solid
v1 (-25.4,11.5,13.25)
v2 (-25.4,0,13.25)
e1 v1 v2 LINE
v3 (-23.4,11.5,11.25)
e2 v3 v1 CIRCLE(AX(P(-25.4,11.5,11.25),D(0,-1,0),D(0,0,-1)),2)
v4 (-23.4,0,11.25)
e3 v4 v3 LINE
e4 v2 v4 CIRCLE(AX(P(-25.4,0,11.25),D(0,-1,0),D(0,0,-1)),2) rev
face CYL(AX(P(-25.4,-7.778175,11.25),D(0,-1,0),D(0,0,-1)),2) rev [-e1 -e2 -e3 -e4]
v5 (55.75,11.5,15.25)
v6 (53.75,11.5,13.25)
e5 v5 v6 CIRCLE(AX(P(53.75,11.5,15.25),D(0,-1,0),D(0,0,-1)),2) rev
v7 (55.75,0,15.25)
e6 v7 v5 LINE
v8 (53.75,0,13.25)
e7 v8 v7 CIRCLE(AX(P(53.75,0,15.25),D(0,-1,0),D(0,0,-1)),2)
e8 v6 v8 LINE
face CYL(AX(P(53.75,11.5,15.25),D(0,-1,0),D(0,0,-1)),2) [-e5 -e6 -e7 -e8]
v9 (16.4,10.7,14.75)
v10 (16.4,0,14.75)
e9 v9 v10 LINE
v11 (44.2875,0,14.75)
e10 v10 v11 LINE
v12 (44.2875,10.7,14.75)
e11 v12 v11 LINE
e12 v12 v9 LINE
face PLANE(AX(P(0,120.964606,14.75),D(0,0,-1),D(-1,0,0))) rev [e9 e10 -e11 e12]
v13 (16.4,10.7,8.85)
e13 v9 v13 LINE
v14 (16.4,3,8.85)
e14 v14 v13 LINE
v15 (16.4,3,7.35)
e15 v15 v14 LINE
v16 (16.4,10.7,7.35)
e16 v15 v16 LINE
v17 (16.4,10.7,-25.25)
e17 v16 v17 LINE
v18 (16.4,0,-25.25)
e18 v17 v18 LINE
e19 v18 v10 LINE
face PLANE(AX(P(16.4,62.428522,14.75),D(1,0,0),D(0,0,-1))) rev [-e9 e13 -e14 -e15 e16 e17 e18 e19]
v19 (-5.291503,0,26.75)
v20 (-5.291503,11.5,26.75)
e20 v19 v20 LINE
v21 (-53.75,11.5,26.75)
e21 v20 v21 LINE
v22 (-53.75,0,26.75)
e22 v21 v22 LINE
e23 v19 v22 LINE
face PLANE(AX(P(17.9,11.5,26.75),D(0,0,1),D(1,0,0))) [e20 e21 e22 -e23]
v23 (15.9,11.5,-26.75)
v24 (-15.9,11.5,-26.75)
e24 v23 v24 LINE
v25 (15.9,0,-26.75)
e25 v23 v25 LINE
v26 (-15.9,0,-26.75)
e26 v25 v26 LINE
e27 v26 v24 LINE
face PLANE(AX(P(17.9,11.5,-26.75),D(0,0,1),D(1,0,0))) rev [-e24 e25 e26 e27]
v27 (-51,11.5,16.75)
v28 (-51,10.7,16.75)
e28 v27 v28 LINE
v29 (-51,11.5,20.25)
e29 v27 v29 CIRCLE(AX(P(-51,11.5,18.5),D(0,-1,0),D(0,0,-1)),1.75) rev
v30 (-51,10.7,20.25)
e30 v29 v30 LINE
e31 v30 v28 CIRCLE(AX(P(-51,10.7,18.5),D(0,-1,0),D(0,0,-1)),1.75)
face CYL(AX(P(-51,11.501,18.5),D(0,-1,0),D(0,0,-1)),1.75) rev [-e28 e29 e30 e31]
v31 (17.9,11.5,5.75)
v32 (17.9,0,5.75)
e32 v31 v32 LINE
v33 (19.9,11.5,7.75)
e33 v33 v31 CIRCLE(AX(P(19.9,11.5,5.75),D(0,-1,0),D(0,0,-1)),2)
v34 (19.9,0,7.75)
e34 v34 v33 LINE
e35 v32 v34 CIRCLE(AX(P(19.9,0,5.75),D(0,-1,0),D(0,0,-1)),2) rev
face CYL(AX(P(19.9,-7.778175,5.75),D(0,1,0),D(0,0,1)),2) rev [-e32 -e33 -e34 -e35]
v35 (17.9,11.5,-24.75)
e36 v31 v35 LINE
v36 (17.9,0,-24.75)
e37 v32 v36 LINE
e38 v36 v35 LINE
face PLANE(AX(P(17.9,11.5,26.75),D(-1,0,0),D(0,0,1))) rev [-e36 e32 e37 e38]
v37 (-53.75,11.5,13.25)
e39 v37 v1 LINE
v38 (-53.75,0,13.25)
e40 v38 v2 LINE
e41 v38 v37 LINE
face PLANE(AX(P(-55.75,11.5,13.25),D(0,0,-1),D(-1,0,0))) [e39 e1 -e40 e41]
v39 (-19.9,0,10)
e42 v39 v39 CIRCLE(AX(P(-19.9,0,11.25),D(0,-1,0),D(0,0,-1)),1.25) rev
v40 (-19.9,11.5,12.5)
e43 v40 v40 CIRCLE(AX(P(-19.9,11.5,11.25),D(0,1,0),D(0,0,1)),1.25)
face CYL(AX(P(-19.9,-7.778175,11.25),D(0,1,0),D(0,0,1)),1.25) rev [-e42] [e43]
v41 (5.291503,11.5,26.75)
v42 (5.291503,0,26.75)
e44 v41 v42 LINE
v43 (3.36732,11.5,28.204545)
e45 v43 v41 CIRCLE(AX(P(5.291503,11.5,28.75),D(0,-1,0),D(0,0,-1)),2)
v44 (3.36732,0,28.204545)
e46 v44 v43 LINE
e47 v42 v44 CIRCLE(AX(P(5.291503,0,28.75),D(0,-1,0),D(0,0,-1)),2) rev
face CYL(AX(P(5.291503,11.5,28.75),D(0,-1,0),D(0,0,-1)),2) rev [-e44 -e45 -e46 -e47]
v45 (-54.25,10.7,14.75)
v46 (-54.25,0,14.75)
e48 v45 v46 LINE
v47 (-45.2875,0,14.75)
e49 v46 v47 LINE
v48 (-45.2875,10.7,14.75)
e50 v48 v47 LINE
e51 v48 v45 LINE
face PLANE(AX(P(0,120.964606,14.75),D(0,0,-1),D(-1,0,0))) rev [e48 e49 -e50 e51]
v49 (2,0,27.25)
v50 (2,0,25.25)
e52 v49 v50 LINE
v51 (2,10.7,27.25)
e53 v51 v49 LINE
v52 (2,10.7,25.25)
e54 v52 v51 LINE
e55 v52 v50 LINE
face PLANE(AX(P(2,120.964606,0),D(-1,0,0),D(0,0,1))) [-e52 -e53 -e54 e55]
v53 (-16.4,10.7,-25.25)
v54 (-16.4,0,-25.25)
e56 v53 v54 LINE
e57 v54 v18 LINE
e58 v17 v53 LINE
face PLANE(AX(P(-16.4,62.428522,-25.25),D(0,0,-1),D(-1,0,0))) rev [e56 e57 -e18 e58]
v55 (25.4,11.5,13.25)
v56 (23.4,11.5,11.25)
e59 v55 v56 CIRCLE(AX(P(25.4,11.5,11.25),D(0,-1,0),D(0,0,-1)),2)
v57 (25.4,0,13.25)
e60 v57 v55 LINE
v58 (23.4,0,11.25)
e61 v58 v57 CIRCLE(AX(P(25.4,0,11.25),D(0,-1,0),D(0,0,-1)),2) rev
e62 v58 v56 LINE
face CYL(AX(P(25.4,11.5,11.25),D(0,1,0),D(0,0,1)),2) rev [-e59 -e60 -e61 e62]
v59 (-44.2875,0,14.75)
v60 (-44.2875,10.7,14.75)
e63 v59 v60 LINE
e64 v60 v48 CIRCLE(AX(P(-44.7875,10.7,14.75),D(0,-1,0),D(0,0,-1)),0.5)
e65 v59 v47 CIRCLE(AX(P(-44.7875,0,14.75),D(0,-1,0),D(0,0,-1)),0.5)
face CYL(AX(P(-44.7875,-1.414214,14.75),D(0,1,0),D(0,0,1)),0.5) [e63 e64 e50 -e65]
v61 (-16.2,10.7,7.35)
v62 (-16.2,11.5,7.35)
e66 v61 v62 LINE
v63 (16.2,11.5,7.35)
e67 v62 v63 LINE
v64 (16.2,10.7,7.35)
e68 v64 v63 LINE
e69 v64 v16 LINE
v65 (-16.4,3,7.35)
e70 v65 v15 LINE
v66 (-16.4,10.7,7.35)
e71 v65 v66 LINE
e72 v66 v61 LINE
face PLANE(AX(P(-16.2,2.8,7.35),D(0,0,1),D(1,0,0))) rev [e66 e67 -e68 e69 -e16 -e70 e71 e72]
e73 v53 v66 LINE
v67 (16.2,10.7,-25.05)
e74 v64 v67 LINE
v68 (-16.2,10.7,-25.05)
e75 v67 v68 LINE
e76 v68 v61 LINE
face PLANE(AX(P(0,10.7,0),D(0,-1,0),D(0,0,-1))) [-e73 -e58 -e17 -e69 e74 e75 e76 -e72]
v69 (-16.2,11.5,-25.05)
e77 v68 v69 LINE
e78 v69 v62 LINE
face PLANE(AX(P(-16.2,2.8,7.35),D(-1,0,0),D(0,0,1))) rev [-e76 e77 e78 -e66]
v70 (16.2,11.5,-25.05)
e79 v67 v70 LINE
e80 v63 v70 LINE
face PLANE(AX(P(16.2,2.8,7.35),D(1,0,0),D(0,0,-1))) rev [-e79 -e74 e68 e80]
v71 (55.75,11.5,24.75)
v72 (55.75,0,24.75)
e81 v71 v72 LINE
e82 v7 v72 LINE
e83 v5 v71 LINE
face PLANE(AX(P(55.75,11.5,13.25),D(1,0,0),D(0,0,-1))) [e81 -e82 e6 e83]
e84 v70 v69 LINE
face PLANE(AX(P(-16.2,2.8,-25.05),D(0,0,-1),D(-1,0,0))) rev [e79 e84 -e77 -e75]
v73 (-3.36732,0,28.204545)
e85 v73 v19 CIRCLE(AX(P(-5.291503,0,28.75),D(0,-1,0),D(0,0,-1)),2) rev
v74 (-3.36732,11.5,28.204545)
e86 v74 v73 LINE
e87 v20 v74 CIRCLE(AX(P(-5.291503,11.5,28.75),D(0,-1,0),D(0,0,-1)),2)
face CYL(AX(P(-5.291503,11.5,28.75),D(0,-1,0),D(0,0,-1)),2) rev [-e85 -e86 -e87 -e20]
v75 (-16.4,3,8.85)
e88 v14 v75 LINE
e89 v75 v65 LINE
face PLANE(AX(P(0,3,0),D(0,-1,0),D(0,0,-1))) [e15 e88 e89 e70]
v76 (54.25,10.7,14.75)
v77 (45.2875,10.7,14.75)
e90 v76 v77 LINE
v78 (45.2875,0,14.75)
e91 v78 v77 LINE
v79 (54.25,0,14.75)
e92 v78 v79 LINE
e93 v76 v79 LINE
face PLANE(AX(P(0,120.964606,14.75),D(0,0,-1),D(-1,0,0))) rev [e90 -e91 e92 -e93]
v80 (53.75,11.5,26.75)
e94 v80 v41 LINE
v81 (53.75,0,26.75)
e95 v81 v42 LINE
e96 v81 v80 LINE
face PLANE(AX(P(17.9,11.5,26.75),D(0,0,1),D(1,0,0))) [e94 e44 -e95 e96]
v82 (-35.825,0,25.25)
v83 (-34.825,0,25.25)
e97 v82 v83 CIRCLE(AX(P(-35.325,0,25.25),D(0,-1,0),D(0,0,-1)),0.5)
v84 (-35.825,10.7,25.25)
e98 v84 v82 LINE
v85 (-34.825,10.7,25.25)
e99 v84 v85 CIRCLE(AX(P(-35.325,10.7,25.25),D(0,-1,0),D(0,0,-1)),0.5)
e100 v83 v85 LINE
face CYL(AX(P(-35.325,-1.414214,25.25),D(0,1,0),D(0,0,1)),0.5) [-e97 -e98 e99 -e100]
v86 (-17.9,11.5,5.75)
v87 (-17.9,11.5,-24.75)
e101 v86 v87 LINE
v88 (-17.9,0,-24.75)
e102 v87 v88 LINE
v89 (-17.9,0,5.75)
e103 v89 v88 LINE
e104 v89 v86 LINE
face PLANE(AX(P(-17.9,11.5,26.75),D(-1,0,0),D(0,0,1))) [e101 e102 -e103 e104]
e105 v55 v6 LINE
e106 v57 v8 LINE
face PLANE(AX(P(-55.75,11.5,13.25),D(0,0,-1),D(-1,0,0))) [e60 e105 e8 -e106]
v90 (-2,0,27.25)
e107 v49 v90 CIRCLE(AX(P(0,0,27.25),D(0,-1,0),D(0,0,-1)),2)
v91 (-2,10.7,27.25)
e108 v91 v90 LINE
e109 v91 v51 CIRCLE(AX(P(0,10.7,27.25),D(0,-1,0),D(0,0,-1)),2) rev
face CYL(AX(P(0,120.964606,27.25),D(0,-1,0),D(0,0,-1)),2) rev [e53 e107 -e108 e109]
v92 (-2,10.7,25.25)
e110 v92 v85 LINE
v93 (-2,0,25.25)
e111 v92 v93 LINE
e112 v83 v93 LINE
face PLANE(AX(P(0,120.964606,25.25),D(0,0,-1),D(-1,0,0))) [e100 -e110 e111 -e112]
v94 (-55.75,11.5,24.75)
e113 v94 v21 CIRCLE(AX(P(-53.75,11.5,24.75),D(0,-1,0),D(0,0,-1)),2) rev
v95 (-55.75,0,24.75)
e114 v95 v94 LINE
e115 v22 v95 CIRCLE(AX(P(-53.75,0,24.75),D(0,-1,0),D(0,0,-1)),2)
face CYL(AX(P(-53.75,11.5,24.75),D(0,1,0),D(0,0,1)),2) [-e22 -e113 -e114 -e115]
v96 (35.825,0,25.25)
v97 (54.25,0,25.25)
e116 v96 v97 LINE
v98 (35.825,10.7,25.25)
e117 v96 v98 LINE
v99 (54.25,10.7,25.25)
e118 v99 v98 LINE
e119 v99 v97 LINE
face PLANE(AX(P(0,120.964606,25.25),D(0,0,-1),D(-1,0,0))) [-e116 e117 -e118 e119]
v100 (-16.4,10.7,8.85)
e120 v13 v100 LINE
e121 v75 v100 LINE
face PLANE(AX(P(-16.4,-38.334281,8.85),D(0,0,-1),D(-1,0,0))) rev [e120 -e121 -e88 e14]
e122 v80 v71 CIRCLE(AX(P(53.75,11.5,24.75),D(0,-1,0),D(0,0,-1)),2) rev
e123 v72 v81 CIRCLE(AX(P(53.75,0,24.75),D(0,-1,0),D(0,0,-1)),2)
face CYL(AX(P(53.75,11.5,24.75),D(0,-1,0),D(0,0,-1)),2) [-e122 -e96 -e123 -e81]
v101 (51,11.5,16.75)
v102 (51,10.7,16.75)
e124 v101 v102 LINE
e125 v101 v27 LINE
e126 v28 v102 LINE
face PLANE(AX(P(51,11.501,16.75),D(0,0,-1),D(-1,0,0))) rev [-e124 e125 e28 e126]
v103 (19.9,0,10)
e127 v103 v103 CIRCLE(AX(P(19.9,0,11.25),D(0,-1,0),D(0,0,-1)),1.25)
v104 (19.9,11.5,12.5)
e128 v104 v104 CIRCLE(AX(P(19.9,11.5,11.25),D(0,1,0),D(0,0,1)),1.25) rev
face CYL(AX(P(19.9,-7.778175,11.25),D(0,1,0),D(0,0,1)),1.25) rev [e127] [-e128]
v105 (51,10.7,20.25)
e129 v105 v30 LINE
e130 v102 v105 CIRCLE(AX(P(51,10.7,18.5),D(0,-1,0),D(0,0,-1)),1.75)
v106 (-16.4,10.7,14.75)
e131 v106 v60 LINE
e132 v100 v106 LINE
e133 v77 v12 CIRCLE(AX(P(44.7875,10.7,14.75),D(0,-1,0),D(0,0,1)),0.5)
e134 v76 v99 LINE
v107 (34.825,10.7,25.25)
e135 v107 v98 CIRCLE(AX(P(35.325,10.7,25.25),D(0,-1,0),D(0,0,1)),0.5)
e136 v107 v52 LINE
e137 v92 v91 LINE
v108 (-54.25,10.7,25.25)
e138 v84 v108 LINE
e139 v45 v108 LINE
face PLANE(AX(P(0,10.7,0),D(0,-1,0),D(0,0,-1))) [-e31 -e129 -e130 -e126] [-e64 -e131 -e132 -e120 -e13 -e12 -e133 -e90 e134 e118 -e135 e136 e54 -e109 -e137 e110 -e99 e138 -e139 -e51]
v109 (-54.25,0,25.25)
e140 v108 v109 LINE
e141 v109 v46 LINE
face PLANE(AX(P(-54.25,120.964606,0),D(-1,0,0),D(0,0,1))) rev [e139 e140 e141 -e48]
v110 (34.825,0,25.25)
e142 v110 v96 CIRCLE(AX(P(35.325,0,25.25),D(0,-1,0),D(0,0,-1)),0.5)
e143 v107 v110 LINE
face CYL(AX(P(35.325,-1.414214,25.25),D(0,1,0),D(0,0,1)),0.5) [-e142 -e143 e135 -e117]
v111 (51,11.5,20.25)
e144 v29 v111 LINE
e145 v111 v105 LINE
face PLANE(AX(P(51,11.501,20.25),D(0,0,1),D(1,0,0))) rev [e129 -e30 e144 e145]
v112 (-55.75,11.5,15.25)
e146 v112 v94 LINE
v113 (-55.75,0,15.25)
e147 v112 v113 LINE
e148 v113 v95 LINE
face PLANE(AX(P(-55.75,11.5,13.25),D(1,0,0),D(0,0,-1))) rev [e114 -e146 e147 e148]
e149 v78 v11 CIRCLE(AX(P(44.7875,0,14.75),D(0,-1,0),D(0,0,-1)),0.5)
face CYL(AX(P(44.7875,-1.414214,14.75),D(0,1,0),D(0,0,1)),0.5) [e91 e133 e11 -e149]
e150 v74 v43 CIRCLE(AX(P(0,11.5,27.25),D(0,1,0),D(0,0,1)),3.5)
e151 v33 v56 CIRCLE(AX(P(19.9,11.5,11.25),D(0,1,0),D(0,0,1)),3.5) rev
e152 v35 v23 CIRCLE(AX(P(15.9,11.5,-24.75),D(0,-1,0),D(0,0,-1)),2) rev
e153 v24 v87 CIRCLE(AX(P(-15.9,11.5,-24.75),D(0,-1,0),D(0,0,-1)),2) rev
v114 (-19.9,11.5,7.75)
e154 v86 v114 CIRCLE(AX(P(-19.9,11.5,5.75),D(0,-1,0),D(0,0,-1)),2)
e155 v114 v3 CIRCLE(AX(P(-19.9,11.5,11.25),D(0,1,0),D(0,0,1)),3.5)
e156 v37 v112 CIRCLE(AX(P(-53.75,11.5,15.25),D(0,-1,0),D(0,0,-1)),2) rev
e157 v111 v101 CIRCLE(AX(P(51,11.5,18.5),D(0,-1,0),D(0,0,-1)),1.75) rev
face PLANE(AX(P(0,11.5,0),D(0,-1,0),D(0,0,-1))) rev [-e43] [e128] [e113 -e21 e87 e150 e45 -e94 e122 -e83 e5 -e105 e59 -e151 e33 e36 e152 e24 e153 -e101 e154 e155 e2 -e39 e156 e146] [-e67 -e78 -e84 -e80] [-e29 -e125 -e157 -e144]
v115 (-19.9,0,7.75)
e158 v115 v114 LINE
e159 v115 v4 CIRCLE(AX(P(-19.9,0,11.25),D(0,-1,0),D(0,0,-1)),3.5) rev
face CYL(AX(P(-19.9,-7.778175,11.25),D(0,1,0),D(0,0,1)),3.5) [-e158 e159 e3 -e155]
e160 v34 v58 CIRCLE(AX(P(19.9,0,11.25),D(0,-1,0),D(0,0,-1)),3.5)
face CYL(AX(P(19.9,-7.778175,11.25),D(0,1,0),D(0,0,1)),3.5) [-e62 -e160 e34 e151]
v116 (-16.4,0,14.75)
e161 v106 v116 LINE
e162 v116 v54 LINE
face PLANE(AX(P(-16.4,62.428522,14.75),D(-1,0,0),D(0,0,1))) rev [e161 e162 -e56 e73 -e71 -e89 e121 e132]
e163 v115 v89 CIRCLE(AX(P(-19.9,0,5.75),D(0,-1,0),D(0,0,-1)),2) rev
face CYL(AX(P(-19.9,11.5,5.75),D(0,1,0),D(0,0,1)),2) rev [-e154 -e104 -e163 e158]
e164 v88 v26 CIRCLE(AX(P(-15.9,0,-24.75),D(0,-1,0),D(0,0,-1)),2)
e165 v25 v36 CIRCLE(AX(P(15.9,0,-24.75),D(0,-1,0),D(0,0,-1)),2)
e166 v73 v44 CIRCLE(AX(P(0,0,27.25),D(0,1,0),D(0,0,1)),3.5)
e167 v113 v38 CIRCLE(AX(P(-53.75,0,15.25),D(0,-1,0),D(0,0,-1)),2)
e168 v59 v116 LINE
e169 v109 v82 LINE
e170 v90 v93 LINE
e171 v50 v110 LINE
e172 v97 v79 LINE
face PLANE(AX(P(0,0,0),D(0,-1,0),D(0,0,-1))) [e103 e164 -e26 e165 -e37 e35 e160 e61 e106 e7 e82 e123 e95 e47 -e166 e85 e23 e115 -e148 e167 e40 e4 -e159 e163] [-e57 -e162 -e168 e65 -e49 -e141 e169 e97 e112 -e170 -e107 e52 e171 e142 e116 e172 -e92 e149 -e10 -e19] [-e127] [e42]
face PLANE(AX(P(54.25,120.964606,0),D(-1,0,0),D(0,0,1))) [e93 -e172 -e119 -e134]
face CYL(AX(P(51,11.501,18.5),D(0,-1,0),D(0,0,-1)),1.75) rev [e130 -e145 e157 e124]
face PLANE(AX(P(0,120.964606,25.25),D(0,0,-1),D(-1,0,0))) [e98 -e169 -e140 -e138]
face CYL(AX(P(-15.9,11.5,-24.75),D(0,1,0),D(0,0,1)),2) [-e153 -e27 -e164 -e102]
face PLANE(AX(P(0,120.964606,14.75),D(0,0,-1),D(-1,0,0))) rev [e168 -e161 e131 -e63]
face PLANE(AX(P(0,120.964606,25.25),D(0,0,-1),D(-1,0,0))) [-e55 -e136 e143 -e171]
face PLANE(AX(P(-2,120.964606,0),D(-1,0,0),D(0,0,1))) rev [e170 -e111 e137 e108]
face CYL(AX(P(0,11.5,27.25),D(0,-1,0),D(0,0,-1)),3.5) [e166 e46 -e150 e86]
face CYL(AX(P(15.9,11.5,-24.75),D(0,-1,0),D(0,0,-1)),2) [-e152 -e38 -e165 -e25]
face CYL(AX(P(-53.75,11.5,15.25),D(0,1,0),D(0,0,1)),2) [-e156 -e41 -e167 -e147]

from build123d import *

# Parameters (mm, degrees)
BOSS_EXTRUDE1_DEPTH = 11.5
SKETCH2_W           = 32.4
SKETCH2_H           = 32.4
CUT_EXTRUDE1_DEPTH  = 8.7
SKETCH3_R           = 2
SKETCH3_W           = 108.5
SKETCH3_H           = 10.5
CUT_EXTRUDE2_DEPTH  = 10.7
CUT_EXTRUDE3_REACH  = 66.561
SKETCH5_W           = 32.8
SKETCH5_H           = 40
CUT_EXTRUDE4_DEPTH  = 10.7
SKETCH6_W           = 32.8
SKETCH6_H           = 1.5
BOSS_EXTRUDE2_DEPTH = 7.7
SKETCH8_R           = 2
SKETCH8_R_2         = 1.25
BOSS_EXTRUDE5_DEPTH = 11.5
FILLET1_R           = 2
SKETCH9_R           = 0.5
BOSS_EXTRUDE6_DEPTH = 10.7


with BuildPart() as part:
    # Sketch1 → Boss-Extrude1 (new body)
    with BuildSketch(Plane(origin=(0, 0, 0), x_dir=(1, 0, 0), z_dir=(0, 1, 0))):
        with BuildLine():
            Line((3.464101615, -26.75), (55.75, -26.75))
            Line((55.75, -26.75), (55.75, -13.25))
            Line((55.75, -13.25), (17.9, -13.25))
            Line((17.9, -13.25), (17.9, 26.75))
            Line((17.9, 26.75), (-17.9, 26.75))
            Line((-17.9, 26.75), (-17.9, -13.25))
            Line((-17.9, -13.25), (-55.75, -13.25))
            Line((-55.75, -13.25), (-55.75, -26.75))
            Line((-55.75, -26.75), (-3.464101615, -26.75))
            ThreePointArc((-3.464101615, -26.75), (0, -30.75), (3.464101615, -26.75))
        make_face()
    extrude(amount=BOSS_EXTRUDE1_DEPTH)

    # Sketch2 → Cut-Extrude1 (cut)
    with BuildSketch(Plane(origin=(0, 11.5, 0), x_dir=(1, 0, 0), z_dir=(0, 1, 0))):
        with Locations((0, 8.85)):
            Rectangle(SKETCH2_W, SKETCH2_H)
    extrude(amount=-CUT_EXTRUDE1_DEPTH, mode=Mode.SUBTRACT)

    # Sketch3 → Cut-Extrude2 (cut)
    with BuildSketch(Plane.XZ):
        with Locations((0, 27.25)):
            Circle(SKETCH3_R)
        with BuildLine():
            Line((-2, 27.25), (-2, 25.25))
            Line((-2, 25.25), (-1e-08, 25.25))
            ThreePointArc((-1e-08, 25.25), (-1.414213566, 25.835786441), (-2, 27.25))
        make_face()
        with BuildLine():
            ThreePointArc((2, 27.25), (1.414213559, 25.835786434), (-1e-08, 25.25))
            Line((-1e-08, 25.25), (2, 25.25))
            Line((2, 25.25), (2, 27.25))
        make_face()
        with Locations((0, 20)):
            Rectangle(SKETCH3_W, SKETCH3_H)
    extrude(amount=-CUT_EXTRUDE2_DEPTH, mode=Mode.SUBTRACT)

    # Sketch4 → Cut-Extrude3 (cut, up to next)
    with BuildSketch(Plane.XZ.offset(-10.7), mode=Mode.PRIVATE) as cut_extrude3_sk1:
        with BuildLine():
            Line((51, 16.75), (-51, 16.75))
            ThreePointArc((-51, 16.75), (-52.75, 18.5), (-51, 20.25))
            Line((-51, 20.25), (51, 20.25))
            ThreePointArc((51, 20.25), (52.75, 18.5), (51, 16.75))
        make_face()
    cut_extrude3_tool1 = extrude(cut_extrude3_sk1.sketch, amount=-CUT_EXTRUDE3_REACH, mode=Mode.PRIVATE) & part.part
    add(cut_extrude3_tool1.solids().sort_by_distance((0, 10.7, 18.5))[0], mode=Mode.SUBTRACT)

    # Sketch5 → Cut-Extrude4 (cut)
    with BuildSketch(Plane.XZ):
        with Locations((0, -5.25)):
            Rectangle(SKETCH5_W, SKETCH5_H)
    extrude(amount=-CUT_EXTRUDE4_DEPTH, mode=Mode.SUBTRACT)

    # Sketch6 → Boss-Extrude2 (add)
    with BuildSketch(Plane.XZ.offset(-10.7)):
        with Locations((0, 8.1)):
            Rectangle(SKETCH6_W, SKETCH6_H)
    extrude(amount=BOSS_EXTRUDE2_DEPTH)

    # Sketch8 → Boss-Extrude5 (add)
    # profile 1 of 10: a face of its own
    with BuildSketch(Plane(origin=(0, 11.5, 0), x_dir=(1, 0, 0), z_dir=(0, 1, 0))):
        with BuildLine():
            Line((-17.9, -7.75), (-19.9, -7.75))
            ThreePointArc((-19.9, -7.75), (-18.851902827, -7.910614979), (-17.9, -8.377718677))
            Line((-17.9, -8.377718677), (-17.9, -7.75))
        make_face()
    # profile 2 of 10: a face of its own
    with BuildSketch(Plane(origin=(0, 11.5, 0), x_dir=(1, 0, 0), z_dir=(0, 1, 0))):
        with BuildLine():
            ThreePointArc((-17.9, -8.377718677), (-18.851902827, -7.910614979), (-19.9, -7.75))
            ThreePointArc((-19.9, -7.75), (-22.374873734, -8.775126266), (-23.4, -11.25))
            ThreePointArc((-23.4, -11.25), (-23.239385021, -12.298097173), (-22.772281323, -13.25))
            Line((-22.772281323, -13.25), (-19.9, -13.25))
            ThreePointArc((-19.9, -13.25), (-21.314213562, -9.835786438), (-17.9, -11.25))
            Line((-17.9, -11.25), (-17.9, -8.377718677))
        make_face()
    # profile 3 of 10: a face of its own
    with BuildSketch(Plane(origin=(0, 11.5, 0), x_dir=(1, 0, 0), z_dir=(0, 1, 0))):
        with Locations((-19.9, -11.25)):
            Circle(SKETCH8_R)
        with Locations(Location((-19.9, -11.25, 0), (0, 0, 270))):
            Circle(SKETCH8_R_2, mode=Mode.SUBTRACT)
    # profile 4 of 10: a face of its own
    with BuildSketch(Plane(origin=(0, 11.5, 0), x_dir=(1, 0, 0), z_dir=(0, 1, 0))):
        with BuildLine():
            Line((-17.9, -13.25), (-17.9, -11.25))
            ThreePointArc((-17.9, -11.25), (-18.485786438, -12.664213562), (-19.9, -13.25))
            Line((-19.9, -13.25), (-17.9, -13.25))
        make_face()
    # profile 5 of 10: a face of its own
    with BuildSketch(Plane(origin=(0, 11.5, 0), x_dir=(1, 0, 0), z_dir=(0, 1, 0))):
        with BuildLine():
            ThreePointArc((-22.772281323, -13.25), (-23.239385021, -12.298097173), (-23.4, -11.25))
            Line((-23.4, -11.25), (-23.4, -13.25))
            Line((-23.4, -13.25), (-22.772281323, -13.25))
        make_face()
    # profile 6 of 10: a face of its own
    with BuildSketch(Plane(origin=(0, 11.5, 0), x_dir=(1, 0, 0), z_dir=(0, 1, 0))):
        with BuildLine():
            Line((17.9, -13.25), (19.9, -13.25))
            ThreePointArc((19.9, -13.25), (18.485786438, -12.664213562), (17.9, -11.25))
            Line((17.9, -11.25), (17.9, -13.25))
        make_face()
    # profile 7 of 10: a face of its own
    with BuildSketch(Plane(origin=(0, 11.5, 0), x_dir=(1, 0, 0), z_dir=(0, 1, 0))):
        with Locations((19.9, -11.25)):
            Circle(SKETCH8_R)
        with Locations(Location((19.9, -11.25, 0), (0, 0, 270))):
            Circle(SKETCH8_R_2, mode=Mode.SUBTRACT)
    # profile 8 of 10: a face of its own
    with BuildSketch(Plane(origin=(0, 11.5, 0), x_dir=(1, 0, 0), z_dir=(0, 1, 0))):
        with BuildLine():
            ThreePointArc((22.772281323, -13.25), (23.239385021, -12.298097173), (23.4, -11.25))
            ThreePointArc((23.4, -11.25), (22.374873734, -8.775126266), (19.9, -7.75))
            ThreePointArc((19.9, -7.75), (18.851902827, -7.910614979), (17.9, -8.377718677))
            Line((17.9, -8.377718677), (17.9, -11.25))
            ThreePointArc((17.9, -11.25), (19.9, -9.25), (21.9, -11.25))
            ThreePointArc((21.9, -11.25), (21.314213562, -12.664213562), (19.9, -13.25))
            Line((19.9, -13.25), (22.772281323, -13.25))
        make_face()
    # profile 9 of 10: a face of its own
    with BuildSketch(Plane(origin=(0, 11.5, 0), x_dir=(1, 0, 0), z_dir=(0, 1, 0))):
        with BuildLine():
            ThreePointArc((17.9, -8.377718677), (18.851902827, -7.910614979), (19.9, -7.75))
            Line((19.9, -7.75), (17.9, -7.75))
            Line((17.9, -7.75), (17.9, -8.377718677))
        make_face()
    # profile 10 of 10: a face of its own
    with BuildSketch(Plane(origin=(0, 11.5, 0), x_dir=(1, 0, 0), z_dir=(0, 1, 0))):
        with BuildLine():
            Line((23.4, -13.25), (23.4, -11.25))
            ThreePointArc((23.4, -11.25), (23.239385021, -12.298097173), (22.772281323, -13.25))
            Line((22.772281323, -13.25), (23.4, -13.25))
        make_face()
    extrude(amount=-BOSS_EXTRUDE5_DEPTH)

    # Fillet1
    fillet1_edges = [part.edges().sort_by_distance(p)[0] for p in [
        (55.75, 5.75, 26.75),
        (55.75, 5.75, 13.25),
        (-55.75, 5.75, 26.75),
        (-55.75, 5.75, 13.25),
        (-17.9, 5.75, -26.75),
        (17.9, 5.75, -26.75),
        (-17.9, 5.75, 7.75),
        (-23.4, 5.75, 13.25),
        (23.4, 5.75, 13.25),
        (17.9, 5.75, 7.75),
        (3.464101615, 5.75, 26.75),
        (-3.464101615, 5.75, 26.75),
    ]]
    fillet(fillet1_edges, radius=FILLET1_R - 0.0001)  # a hair under: the kernel refuses the full size

    # Sketch9 → Boss-Extrude6 (add)
    with BuildSketch(Plane.XZ.offset(-10.7)):
        with Locations((-35.325, 25.25)):
            Circle(SKETCH9_R)
        with Locations((-44.7875, 14.75)):
            Circle(SKETCH9_R)
        with Locations((35.325, 25.25)):
            Circle(SKETCH9_R)
        with Locations((44.7875, 14.75)):
            Circle(SKETCH9_R)
    extrude(amount=BOSS_EXTRUDE6_DEPTH)


solid = part.part
